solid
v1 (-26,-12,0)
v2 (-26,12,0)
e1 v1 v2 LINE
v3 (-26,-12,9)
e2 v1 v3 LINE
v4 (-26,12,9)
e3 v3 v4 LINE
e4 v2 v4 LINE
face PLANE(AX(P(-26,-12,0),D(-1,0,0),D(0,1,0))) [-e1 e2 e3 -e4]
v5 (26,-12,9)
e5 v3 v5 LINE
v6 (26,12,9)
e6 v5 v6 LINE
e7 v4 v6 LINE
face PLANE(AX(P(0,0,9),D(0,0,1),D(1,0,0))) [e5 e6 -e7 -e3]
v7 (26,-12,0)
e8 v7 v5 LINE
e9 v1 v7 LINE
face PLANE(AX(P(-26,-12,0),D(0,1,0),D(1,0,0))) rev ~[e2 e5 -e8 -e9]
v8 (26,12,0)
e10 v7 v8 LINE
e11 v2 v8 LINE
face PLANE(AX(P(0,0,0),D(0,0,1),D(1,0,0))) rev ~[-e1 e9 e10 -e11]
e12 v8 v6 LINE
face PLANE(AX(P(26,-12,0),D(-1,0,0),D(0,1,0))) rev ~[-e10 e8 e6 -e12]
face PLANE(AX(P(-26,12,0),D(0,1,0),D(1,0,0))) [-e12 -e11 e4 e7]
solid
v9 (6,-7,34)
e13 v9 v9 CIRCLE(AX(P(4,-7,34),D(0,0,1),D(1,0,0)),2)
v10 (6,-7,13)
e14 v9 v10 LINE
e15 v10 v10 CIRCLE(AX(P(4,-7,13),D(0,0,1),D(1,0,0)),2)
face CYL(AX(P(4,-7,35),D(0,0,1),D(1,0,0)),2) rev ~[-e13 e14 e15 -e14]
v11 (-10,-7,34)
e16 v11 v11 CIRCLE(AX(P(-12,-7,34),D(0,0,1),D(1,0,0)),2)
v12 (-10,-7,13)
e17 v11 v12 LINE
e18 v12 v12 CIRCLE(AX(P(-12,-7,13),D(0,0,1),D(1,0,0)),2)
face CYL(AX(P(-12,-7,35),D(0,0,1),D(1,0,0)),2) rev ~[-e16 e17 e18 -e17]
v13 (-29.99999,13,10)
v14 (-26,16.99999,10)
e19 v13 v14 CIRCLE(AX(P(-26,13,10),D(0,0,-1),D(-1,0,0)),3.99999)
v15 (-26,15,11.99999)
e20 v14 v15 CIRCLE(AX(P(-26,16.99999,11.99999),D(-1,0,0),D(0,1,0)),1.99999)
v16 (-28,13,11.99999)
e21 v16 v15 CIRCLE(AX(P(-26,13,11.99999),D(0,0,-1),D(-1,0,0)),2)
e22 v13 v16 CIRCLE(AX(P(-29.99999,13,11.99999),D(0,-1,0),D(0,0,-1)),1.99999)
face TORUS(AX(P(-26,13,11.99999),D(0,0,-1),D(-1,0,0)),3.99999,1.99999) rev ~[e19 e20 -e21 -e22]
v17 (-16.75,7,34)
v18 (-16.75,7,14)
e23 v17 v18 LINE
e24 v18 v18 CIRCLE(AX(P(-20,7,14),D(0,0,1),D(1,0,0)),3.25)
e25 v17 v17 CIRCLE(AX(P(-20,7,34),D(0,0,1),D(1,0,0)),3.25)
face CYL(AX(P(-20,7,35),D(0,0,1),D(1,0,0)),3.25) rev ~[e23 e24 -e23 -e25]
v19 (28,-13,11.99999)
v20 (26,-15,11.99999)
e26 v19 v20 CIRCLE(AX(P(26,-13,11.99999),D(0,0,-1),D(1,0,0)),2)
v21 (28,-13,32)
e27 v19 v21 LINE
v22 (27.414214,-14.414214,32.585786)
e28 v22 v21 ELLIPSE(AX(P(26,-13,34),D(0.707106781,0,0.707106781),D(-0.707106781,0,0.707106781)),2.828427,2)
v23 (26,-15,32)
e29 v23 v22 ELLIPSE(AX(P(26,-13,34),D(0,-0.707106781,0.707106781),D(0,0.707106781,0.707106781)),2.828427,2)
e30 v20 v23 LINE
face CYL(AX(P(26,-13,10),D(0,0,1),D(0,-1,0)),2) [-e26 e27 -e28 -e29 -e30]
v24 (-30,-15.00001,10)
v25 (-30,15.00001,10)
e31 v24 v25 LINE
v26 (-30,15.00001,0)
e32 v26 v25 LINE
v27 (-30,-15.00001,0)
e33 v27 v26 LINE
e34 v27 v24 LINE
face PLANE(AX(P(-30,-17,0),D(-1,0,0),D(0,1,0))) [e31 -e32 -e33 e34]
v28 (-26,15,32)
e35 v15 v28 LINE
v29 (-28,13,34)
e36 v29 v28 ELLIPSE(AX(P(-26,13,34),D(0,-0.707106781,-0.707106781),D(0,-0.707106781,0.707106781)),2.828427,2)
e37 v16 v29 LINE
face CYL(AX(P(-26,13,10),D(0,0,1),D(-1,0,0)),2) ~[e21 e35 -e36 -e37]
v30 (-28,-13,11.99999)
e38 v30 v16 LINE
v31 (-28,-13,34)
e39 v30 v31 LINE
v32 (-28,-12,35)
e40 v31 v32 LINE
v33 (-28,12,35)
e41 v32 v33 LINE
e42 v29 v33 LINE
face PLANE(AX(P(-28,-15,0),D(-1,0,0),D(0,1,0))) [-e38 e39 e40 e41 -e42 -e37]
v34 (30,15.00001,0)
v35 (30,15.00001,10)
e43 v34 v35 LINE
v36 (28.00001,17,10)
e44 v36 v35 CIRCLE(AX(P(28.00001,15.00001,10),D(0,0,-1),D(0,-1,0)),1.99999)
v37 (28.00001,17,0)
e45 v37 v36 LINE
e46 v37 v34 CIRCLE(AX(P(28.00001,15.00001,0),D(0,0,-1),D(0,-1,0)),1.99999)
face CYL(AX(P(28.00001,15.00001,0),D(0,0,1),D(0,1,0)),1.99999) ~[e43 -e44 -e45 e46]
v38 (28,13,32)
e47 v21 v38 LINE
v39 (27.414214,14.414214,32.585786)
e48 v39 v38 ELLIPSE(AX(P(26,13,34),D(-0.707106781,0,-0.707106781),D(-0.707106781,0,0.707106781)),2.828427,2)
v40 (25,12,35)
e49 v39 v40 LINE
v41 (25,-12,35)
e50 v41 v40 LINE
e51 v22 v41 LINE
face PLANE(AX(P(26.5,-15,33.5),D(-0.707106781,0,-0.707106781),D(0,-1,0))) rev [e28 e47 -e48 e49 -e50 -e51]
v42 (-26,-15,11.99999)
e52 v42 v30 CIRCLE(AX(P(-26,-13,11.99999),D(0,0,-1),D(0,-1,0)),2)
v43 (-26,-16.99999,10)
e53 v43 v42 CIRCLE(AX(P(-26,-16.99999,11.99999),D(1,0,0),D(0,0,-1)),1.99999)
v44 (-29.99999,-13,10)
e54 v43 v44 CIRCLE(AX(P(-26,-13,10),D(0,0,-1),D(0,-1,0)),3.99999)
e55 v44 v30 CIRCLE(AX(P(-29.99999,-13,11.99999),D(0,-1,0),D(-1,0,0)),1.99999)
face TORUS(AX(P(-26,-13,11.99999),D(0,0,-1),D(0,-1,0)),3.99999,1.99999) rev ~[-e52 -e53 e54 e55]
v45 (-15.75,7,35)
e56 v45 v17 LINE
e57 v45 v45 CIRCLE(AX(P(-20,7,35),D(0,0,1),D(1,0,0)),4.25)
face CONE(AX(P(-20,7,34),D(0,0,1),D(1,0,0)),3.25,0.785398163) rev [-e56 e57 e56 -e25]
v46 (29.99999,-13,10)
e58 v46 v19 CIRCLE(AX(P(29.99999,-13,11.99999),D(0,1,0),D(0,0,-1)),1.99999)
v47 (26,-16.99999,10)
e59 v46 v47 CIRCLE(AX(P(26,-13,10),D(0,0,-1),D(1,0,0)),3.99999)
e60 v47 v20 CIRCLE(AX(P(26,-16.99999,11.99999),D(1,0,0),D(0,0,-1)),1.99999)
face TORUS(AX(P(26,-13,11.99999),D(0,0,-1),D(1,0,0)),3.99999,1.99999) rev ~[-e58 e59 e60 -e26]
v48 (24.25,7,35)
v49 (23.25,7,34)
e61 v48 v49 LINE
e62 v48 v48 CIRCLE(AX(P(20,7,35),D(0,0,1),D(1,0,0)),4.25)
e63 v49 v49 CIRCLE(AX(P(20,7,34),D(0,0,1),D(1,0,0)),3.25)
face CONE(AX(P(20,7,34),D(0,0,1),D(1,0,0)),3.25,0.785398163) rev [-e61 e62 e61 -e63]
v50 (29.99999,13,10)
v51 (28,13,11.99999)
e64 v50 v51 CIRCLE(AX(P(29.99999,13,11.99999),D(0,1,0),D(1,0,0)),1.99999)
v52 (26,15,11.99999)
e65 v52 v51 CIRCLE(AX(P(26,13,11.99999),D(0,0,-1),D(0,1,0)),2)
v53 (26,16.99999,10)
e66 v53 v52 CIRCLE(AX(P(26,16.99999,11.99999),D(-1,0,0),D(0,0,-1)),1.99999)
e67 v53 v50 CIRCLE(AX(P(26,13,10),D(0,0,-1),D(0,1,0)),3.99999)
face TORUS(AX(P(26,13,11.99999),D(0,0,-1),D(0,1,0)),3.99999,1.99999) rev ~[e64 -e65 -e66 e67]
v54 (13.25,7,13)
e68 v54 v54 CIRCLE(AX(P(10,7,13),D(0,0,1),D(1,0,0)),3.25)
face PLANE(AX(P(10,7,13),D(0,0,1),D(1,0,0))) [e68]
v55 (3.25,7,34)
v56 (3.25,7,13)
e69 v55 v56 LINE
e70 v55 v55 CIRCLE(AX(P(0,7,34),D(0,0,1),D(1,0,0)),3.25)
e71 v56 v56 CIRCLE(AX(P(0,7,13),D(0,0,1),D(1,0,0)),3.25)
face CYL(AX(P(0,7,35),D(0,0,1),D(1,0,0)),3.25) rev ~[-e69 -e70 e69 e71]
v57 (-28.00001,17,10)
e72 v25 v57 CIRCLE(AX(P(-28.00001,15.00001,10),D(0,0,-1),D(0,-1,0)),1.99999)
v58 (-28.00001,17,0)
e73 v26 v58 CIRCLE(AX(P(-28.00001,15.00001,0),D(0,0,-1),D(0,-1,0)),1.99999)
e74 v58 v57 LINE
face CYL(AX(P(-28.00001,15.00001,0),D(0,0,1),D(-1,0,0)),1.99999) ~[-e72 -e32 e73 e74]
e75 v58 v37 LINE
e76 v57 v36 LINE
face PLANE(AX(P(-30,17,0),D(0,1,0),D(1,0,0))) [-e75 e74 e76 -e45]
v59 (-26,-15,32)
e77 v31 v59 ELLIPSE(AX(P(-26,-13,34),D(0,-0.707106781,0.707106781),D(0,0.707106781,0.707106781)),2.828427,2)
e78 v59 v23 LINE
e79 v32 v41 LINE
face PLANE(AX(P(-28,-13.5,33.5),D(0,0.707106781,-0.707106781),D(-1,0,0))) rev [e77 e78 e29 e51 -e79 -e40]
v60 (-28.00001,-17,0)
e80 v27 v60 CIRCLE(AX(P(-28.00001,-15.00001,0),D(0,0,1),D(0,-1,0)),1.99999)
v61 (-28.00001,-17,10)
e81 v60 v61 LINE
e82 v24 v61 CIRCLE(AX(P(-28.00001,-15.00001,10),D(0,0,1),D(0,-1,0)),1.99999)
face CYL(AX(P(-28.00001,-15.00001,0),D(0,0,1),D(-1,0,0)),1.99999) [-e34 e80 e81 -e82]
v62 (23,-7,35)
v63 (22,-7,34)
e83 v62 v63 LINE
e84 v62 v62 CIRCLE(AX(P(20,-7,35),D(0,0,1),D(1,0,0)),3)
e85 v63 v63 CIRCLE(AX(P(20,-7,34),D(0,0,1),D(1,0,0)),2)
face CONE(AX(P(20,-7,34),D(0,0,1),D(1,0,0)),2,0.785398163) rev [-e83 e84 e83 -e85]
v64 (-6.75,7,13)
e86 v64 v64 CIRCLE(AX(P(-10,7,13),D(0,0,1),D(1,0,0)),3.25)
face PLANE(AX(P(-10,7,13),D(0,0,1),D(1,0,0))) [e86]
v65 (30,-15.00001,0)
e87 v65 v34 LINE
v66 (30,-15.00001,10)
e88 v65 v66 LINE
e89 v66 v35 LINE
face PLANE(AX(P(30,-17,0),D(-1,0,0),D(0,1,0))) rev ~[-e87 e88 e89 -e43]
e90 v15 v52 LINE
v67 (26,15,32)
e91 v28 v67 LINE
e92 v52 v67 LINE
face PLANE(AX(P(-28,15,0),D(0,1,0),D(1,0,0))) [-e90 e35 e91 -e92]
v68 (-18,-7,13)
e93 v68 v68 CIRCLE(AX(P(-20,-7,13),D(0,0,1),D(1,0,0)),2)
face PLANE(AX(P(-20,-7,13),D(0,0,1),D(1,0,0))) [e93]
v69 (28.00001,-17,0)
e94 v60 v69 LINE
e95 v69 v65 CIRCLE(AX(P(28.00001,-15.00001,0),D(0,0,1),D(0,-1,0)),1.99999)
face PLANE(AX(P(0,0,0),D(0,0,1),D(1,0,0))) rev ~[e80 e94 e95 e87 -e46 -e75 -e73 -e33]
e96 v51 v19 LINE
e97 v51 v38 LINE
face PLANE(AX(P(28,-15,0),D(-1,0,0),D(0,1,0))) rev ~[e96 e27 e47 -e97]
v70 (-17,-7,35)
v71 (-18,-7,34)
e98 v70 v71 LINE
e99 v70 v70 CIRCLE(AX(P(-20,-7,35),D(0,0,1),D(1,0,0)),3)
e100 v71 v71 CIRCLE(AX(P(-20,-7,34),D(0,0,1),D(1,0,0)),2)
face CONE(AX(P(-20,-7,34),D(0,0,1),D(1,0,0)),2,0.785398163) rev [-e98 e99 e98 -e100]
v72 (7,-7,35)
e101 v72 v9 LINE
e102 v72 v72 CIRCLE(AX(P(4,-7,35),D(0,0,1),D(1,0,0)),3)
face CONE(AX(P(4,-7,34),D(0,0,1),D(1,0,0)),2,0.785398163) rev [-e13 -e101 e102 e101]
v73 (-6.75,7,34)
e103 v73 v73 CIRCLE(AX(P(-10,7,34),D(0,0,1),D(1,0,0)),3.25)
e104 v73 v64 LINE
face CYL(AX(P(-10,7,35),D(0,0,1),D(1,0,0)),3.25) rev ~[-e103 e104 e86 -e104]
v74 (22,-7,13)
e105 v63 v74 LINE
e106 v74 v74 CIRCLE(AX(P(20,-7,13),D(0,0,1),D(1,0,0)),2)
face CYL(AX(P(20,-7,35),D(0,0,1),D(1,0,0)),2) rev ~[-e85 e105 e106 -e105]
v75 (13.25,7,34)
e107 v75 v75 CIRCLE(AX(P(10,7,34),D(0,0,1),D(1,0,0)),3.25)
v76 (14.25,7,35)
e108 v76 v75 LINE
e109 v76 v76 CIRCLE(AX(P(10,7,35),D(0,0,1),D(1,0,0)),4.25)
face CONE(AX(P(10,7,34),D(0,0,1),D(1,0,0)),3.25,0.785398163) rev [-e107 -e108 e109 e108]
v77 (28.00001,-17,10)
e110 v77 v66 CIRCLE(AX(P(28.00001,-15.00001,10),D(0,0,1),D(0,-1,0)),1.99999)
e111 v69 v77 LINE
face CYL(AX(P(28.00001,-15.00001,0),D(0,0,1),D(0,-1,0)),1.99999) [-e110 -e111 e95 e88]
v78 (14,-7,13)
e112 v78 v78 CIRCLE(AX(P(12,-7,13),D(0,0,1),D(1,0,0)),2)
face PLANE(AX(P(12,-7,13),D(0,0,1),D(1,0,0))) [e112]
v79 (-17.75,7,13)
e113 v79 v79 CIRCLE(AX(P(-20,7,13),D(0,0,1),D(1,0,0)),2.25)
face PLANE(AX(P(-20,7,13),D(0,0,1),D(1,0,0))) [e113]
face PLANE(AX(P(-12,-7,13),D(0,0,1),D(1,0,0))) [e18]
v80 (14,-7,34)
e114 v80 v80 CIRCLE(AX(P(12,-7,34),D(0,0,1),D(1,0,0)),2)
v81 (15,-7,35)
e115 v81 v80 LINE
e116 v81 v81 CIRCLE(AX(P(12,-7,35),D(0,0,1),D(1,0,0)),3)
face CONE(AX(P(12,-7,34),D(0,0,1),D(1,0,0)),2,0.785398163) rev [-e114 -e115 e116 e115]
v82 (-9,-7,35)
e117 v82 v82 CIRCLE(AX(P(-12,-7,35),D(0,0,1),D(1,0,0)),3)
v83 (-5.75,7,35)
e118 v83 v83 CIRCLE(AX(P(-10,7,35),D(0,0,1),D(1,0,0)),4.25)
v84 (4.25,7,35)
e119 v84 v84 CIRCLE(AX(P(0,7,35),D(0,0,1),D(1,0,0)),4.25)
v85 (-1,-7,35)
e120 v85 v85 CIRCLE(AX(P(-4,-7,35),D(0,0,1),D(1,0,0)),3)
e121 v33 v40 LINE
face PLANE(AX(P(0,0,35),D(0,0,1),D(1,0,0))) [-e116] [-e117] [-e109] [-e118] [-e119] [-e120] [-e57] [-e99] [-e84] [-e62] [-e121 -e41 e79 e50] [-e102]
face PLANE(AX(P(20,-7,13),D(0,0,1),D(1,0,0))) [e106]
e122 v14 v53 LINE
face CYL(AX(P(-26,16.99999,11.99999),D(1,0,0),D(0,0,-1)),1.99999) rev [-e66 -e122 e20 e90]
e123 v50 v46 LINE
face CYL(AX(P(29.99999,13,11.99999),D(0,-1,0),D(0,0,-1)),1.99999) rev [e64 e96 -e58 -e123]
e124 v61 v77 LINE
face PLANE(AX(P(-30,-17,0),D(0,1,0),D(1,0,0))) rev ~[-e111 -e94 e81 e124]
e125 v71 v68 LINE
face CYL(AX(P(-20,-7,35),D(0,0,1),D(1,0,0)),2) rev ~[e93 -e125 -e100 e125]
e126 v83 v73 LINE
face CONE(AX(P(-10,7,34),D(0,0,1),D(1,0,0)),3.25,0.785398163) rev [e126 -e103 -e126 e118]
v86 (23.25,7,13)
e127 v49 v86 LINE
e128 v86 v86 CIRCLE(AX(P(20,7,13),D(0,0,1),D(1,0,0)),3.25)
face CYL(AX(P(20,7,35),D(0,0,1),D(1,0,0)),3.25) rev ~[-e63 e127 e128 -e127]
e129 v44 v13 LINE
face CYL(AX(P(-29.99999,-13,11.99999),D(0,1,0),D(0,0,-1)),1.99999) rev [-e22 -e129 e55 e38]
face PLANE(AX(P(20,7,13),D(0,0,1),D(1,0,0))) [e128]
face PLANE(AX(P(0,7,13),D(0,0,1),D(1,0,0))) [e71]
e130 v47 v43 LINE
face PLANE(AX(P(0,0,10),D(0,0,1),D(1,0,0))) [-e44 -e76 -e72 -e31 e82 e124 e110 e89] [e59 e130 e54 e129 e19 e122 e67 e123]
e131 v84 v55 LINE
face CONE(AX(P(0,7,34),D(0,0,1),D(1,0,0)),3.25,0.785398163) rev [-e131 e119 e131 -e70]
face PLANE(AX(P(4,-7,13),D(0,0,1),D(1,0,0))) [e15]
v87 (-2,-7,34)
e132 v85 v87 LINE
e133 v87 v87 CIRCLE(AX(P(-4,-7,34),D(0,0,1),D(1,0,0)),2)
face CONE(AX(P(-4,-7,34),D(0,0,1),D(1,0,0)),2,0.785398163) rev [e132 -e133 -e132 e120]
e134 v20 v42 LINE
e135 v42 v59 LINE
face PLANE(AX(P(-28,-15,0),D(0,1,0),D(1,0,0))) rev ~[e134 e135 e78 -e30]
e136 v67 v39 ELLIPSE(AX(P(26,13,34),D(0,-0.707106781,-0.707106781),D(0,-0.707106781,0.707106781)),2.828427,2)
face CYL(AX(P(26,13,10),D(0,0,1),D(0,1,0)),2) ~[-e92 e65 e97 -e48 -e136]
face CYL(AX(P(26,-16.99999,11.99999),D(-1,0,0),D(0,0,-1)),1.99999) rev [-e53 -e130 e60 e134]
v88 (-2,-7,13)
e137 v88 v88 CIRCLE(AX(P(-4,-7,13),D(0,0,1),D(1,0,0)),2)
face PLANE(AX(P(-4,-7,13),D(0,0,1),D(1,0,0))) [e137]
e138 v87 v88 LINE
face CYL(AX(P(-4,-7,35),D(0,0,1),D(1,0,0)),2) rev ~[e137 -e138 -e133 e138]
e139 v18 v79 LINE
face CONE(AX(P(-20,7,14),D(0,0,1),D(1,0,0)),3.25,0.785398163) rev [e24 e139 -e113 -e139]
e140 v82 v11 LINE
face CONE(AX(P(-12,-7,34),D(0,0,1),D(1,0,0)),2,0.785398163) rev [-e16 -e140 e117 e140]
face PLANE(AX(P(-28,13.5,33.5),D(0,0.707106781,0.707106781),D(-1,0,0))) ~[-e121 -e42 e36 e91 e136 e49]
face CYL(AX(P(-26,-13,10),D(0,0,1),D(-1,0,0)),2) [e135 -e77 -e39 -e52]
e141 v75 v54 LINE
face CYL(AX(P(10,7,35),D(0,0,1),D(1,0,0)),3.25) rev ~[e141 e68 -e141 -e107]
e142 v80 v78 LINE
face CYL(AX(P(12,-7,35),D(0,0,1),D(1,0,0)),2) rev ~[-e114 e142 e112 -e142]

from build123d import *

# Parameters (mm, degrees)
F0_W      = 60
F0_H      = 34
F0_W_2    = 56
F0_H_2    = 30
F1_DEPTH  = 10
F2_DEPTH  = 35
F3_R      = 2
F3_R_2    = 3.25
F4_DEPTH  = 22
F5_SIZE   = 3
F6_SIZE   = 1
F7_R      = 2
F8_R      = 1.99999
F9_W      = 52
F9_H      = 24
F10_DEPTH = 9


# Not quite as in the source:
# - a fillet or chamfer is up to 0.001 mm smaller than in the source, because OpenCascade refuses the exact size


with BuildPart() as f1:
    # F0 (on Top) → F1 (new body)
    with BuildSketch(Plane.XY):
        Rectangle(F0_W, F0_H)
        Rectangle(F0_W_2, F0_H_2, mode=Mode.SUBTRACT)
        Rectangle(F0_W_2, F0_H_2)
    extrude(amount=F1_DEPTH)

    # F0 (on Top) → F2 (join)
    with BuildSketch(Plane.XY):
        Rectangle(F0_W_2, F0_H_2)
    extrude(amount=F2_DEPTH)

    # F3 (on face) → F4 (cut)
    with BuildSketch(Plane.XY.offset(35)):
        with Locations((-20, -7)):
            Circle(F3_R)
        with Locations((-12, -7)):
            Circle(F3_R)
        with Locations((-4, -7)):
            Circle(F3_R)
        with Locations((4, -7)):
            Circle(F3_R)
        with Locations((12, -7)):
            Circle(F3_R)
        with Locations((20, -7)):
            Circle(F3_R)
        with Locations((-20, 7)):
            Circle(F3_R_2)
        with Locations((-10, 7)):
            Circle(F3_R_2)
        with Locations((0, 7)):
            Circle(F3_R_2)
        with Locations((10, 7)):
            Circle(F3_R_2)
        with Locations((20, 7)):
            Circle(F3_R_2)
    extrude(amount=-F4_DEPTH, mode=Mode.SUBTRACT)

    # F5
    f5_edges = [f1.edges().sort_by_distance(p)[0] for p in [
        (0, 15, 35),
        (28, 0, 35),
        (0, -15, 35),
    ]]
    chamfer(f5_edges, length=F5_SIZE)

    # F6
    f6_edges = [f1.edges().sort_by_distance(p)[0] for p in [
        (-16.75, 7, 24),
        (-23.25, 7, 35),
        (-23.25, 7, 13),
        (-13.25, 7, 35),
        (-3.25, 7, 35),
        (6.75, 7, 35),
        (16.75, 7, 35),
        (-22, -7, 35),
        (-14, -7, 35),
        (-6, -7, 35),
        (2, -7, 35),
        (10, -7, 35),
        (18, -7, 35),
    ]]
    chamfer(f6_edges, length=F6_SIZE)

    # F7
    f7_edges = [f1.edges().sort_by_distance(p)[0] for p in [
        (28, -15, 21),
        (-28, -15, 21),
        (28, 15, 21),
        (-28, 15, 21),
    ]]
    fillet(f7_edges, radius=F7_R)

    # F8 (radius 2 in the source; OpenCascade refuses exactly that, so slightly less here)
    f8_edges = [f1.edges().sort_by_distance(p)[0] for p in [
        (-30, -17, 5),
        (0, -15, 10),
        (30, -17, 5),
        (30, 17, 5),
        (-30, 17, 5),
    ]]
    fillet(f8_edges, radius=F8_R)


with BuildPart() as f10:
    # F9 (on face) → F10 (new body)
    with BuildSketch(Plane.XY):
        Rectangle(F9_W, F9_H)
    extrude(amount=F10_DEPTH)


solid = Compound([f1.part, f10.part])
